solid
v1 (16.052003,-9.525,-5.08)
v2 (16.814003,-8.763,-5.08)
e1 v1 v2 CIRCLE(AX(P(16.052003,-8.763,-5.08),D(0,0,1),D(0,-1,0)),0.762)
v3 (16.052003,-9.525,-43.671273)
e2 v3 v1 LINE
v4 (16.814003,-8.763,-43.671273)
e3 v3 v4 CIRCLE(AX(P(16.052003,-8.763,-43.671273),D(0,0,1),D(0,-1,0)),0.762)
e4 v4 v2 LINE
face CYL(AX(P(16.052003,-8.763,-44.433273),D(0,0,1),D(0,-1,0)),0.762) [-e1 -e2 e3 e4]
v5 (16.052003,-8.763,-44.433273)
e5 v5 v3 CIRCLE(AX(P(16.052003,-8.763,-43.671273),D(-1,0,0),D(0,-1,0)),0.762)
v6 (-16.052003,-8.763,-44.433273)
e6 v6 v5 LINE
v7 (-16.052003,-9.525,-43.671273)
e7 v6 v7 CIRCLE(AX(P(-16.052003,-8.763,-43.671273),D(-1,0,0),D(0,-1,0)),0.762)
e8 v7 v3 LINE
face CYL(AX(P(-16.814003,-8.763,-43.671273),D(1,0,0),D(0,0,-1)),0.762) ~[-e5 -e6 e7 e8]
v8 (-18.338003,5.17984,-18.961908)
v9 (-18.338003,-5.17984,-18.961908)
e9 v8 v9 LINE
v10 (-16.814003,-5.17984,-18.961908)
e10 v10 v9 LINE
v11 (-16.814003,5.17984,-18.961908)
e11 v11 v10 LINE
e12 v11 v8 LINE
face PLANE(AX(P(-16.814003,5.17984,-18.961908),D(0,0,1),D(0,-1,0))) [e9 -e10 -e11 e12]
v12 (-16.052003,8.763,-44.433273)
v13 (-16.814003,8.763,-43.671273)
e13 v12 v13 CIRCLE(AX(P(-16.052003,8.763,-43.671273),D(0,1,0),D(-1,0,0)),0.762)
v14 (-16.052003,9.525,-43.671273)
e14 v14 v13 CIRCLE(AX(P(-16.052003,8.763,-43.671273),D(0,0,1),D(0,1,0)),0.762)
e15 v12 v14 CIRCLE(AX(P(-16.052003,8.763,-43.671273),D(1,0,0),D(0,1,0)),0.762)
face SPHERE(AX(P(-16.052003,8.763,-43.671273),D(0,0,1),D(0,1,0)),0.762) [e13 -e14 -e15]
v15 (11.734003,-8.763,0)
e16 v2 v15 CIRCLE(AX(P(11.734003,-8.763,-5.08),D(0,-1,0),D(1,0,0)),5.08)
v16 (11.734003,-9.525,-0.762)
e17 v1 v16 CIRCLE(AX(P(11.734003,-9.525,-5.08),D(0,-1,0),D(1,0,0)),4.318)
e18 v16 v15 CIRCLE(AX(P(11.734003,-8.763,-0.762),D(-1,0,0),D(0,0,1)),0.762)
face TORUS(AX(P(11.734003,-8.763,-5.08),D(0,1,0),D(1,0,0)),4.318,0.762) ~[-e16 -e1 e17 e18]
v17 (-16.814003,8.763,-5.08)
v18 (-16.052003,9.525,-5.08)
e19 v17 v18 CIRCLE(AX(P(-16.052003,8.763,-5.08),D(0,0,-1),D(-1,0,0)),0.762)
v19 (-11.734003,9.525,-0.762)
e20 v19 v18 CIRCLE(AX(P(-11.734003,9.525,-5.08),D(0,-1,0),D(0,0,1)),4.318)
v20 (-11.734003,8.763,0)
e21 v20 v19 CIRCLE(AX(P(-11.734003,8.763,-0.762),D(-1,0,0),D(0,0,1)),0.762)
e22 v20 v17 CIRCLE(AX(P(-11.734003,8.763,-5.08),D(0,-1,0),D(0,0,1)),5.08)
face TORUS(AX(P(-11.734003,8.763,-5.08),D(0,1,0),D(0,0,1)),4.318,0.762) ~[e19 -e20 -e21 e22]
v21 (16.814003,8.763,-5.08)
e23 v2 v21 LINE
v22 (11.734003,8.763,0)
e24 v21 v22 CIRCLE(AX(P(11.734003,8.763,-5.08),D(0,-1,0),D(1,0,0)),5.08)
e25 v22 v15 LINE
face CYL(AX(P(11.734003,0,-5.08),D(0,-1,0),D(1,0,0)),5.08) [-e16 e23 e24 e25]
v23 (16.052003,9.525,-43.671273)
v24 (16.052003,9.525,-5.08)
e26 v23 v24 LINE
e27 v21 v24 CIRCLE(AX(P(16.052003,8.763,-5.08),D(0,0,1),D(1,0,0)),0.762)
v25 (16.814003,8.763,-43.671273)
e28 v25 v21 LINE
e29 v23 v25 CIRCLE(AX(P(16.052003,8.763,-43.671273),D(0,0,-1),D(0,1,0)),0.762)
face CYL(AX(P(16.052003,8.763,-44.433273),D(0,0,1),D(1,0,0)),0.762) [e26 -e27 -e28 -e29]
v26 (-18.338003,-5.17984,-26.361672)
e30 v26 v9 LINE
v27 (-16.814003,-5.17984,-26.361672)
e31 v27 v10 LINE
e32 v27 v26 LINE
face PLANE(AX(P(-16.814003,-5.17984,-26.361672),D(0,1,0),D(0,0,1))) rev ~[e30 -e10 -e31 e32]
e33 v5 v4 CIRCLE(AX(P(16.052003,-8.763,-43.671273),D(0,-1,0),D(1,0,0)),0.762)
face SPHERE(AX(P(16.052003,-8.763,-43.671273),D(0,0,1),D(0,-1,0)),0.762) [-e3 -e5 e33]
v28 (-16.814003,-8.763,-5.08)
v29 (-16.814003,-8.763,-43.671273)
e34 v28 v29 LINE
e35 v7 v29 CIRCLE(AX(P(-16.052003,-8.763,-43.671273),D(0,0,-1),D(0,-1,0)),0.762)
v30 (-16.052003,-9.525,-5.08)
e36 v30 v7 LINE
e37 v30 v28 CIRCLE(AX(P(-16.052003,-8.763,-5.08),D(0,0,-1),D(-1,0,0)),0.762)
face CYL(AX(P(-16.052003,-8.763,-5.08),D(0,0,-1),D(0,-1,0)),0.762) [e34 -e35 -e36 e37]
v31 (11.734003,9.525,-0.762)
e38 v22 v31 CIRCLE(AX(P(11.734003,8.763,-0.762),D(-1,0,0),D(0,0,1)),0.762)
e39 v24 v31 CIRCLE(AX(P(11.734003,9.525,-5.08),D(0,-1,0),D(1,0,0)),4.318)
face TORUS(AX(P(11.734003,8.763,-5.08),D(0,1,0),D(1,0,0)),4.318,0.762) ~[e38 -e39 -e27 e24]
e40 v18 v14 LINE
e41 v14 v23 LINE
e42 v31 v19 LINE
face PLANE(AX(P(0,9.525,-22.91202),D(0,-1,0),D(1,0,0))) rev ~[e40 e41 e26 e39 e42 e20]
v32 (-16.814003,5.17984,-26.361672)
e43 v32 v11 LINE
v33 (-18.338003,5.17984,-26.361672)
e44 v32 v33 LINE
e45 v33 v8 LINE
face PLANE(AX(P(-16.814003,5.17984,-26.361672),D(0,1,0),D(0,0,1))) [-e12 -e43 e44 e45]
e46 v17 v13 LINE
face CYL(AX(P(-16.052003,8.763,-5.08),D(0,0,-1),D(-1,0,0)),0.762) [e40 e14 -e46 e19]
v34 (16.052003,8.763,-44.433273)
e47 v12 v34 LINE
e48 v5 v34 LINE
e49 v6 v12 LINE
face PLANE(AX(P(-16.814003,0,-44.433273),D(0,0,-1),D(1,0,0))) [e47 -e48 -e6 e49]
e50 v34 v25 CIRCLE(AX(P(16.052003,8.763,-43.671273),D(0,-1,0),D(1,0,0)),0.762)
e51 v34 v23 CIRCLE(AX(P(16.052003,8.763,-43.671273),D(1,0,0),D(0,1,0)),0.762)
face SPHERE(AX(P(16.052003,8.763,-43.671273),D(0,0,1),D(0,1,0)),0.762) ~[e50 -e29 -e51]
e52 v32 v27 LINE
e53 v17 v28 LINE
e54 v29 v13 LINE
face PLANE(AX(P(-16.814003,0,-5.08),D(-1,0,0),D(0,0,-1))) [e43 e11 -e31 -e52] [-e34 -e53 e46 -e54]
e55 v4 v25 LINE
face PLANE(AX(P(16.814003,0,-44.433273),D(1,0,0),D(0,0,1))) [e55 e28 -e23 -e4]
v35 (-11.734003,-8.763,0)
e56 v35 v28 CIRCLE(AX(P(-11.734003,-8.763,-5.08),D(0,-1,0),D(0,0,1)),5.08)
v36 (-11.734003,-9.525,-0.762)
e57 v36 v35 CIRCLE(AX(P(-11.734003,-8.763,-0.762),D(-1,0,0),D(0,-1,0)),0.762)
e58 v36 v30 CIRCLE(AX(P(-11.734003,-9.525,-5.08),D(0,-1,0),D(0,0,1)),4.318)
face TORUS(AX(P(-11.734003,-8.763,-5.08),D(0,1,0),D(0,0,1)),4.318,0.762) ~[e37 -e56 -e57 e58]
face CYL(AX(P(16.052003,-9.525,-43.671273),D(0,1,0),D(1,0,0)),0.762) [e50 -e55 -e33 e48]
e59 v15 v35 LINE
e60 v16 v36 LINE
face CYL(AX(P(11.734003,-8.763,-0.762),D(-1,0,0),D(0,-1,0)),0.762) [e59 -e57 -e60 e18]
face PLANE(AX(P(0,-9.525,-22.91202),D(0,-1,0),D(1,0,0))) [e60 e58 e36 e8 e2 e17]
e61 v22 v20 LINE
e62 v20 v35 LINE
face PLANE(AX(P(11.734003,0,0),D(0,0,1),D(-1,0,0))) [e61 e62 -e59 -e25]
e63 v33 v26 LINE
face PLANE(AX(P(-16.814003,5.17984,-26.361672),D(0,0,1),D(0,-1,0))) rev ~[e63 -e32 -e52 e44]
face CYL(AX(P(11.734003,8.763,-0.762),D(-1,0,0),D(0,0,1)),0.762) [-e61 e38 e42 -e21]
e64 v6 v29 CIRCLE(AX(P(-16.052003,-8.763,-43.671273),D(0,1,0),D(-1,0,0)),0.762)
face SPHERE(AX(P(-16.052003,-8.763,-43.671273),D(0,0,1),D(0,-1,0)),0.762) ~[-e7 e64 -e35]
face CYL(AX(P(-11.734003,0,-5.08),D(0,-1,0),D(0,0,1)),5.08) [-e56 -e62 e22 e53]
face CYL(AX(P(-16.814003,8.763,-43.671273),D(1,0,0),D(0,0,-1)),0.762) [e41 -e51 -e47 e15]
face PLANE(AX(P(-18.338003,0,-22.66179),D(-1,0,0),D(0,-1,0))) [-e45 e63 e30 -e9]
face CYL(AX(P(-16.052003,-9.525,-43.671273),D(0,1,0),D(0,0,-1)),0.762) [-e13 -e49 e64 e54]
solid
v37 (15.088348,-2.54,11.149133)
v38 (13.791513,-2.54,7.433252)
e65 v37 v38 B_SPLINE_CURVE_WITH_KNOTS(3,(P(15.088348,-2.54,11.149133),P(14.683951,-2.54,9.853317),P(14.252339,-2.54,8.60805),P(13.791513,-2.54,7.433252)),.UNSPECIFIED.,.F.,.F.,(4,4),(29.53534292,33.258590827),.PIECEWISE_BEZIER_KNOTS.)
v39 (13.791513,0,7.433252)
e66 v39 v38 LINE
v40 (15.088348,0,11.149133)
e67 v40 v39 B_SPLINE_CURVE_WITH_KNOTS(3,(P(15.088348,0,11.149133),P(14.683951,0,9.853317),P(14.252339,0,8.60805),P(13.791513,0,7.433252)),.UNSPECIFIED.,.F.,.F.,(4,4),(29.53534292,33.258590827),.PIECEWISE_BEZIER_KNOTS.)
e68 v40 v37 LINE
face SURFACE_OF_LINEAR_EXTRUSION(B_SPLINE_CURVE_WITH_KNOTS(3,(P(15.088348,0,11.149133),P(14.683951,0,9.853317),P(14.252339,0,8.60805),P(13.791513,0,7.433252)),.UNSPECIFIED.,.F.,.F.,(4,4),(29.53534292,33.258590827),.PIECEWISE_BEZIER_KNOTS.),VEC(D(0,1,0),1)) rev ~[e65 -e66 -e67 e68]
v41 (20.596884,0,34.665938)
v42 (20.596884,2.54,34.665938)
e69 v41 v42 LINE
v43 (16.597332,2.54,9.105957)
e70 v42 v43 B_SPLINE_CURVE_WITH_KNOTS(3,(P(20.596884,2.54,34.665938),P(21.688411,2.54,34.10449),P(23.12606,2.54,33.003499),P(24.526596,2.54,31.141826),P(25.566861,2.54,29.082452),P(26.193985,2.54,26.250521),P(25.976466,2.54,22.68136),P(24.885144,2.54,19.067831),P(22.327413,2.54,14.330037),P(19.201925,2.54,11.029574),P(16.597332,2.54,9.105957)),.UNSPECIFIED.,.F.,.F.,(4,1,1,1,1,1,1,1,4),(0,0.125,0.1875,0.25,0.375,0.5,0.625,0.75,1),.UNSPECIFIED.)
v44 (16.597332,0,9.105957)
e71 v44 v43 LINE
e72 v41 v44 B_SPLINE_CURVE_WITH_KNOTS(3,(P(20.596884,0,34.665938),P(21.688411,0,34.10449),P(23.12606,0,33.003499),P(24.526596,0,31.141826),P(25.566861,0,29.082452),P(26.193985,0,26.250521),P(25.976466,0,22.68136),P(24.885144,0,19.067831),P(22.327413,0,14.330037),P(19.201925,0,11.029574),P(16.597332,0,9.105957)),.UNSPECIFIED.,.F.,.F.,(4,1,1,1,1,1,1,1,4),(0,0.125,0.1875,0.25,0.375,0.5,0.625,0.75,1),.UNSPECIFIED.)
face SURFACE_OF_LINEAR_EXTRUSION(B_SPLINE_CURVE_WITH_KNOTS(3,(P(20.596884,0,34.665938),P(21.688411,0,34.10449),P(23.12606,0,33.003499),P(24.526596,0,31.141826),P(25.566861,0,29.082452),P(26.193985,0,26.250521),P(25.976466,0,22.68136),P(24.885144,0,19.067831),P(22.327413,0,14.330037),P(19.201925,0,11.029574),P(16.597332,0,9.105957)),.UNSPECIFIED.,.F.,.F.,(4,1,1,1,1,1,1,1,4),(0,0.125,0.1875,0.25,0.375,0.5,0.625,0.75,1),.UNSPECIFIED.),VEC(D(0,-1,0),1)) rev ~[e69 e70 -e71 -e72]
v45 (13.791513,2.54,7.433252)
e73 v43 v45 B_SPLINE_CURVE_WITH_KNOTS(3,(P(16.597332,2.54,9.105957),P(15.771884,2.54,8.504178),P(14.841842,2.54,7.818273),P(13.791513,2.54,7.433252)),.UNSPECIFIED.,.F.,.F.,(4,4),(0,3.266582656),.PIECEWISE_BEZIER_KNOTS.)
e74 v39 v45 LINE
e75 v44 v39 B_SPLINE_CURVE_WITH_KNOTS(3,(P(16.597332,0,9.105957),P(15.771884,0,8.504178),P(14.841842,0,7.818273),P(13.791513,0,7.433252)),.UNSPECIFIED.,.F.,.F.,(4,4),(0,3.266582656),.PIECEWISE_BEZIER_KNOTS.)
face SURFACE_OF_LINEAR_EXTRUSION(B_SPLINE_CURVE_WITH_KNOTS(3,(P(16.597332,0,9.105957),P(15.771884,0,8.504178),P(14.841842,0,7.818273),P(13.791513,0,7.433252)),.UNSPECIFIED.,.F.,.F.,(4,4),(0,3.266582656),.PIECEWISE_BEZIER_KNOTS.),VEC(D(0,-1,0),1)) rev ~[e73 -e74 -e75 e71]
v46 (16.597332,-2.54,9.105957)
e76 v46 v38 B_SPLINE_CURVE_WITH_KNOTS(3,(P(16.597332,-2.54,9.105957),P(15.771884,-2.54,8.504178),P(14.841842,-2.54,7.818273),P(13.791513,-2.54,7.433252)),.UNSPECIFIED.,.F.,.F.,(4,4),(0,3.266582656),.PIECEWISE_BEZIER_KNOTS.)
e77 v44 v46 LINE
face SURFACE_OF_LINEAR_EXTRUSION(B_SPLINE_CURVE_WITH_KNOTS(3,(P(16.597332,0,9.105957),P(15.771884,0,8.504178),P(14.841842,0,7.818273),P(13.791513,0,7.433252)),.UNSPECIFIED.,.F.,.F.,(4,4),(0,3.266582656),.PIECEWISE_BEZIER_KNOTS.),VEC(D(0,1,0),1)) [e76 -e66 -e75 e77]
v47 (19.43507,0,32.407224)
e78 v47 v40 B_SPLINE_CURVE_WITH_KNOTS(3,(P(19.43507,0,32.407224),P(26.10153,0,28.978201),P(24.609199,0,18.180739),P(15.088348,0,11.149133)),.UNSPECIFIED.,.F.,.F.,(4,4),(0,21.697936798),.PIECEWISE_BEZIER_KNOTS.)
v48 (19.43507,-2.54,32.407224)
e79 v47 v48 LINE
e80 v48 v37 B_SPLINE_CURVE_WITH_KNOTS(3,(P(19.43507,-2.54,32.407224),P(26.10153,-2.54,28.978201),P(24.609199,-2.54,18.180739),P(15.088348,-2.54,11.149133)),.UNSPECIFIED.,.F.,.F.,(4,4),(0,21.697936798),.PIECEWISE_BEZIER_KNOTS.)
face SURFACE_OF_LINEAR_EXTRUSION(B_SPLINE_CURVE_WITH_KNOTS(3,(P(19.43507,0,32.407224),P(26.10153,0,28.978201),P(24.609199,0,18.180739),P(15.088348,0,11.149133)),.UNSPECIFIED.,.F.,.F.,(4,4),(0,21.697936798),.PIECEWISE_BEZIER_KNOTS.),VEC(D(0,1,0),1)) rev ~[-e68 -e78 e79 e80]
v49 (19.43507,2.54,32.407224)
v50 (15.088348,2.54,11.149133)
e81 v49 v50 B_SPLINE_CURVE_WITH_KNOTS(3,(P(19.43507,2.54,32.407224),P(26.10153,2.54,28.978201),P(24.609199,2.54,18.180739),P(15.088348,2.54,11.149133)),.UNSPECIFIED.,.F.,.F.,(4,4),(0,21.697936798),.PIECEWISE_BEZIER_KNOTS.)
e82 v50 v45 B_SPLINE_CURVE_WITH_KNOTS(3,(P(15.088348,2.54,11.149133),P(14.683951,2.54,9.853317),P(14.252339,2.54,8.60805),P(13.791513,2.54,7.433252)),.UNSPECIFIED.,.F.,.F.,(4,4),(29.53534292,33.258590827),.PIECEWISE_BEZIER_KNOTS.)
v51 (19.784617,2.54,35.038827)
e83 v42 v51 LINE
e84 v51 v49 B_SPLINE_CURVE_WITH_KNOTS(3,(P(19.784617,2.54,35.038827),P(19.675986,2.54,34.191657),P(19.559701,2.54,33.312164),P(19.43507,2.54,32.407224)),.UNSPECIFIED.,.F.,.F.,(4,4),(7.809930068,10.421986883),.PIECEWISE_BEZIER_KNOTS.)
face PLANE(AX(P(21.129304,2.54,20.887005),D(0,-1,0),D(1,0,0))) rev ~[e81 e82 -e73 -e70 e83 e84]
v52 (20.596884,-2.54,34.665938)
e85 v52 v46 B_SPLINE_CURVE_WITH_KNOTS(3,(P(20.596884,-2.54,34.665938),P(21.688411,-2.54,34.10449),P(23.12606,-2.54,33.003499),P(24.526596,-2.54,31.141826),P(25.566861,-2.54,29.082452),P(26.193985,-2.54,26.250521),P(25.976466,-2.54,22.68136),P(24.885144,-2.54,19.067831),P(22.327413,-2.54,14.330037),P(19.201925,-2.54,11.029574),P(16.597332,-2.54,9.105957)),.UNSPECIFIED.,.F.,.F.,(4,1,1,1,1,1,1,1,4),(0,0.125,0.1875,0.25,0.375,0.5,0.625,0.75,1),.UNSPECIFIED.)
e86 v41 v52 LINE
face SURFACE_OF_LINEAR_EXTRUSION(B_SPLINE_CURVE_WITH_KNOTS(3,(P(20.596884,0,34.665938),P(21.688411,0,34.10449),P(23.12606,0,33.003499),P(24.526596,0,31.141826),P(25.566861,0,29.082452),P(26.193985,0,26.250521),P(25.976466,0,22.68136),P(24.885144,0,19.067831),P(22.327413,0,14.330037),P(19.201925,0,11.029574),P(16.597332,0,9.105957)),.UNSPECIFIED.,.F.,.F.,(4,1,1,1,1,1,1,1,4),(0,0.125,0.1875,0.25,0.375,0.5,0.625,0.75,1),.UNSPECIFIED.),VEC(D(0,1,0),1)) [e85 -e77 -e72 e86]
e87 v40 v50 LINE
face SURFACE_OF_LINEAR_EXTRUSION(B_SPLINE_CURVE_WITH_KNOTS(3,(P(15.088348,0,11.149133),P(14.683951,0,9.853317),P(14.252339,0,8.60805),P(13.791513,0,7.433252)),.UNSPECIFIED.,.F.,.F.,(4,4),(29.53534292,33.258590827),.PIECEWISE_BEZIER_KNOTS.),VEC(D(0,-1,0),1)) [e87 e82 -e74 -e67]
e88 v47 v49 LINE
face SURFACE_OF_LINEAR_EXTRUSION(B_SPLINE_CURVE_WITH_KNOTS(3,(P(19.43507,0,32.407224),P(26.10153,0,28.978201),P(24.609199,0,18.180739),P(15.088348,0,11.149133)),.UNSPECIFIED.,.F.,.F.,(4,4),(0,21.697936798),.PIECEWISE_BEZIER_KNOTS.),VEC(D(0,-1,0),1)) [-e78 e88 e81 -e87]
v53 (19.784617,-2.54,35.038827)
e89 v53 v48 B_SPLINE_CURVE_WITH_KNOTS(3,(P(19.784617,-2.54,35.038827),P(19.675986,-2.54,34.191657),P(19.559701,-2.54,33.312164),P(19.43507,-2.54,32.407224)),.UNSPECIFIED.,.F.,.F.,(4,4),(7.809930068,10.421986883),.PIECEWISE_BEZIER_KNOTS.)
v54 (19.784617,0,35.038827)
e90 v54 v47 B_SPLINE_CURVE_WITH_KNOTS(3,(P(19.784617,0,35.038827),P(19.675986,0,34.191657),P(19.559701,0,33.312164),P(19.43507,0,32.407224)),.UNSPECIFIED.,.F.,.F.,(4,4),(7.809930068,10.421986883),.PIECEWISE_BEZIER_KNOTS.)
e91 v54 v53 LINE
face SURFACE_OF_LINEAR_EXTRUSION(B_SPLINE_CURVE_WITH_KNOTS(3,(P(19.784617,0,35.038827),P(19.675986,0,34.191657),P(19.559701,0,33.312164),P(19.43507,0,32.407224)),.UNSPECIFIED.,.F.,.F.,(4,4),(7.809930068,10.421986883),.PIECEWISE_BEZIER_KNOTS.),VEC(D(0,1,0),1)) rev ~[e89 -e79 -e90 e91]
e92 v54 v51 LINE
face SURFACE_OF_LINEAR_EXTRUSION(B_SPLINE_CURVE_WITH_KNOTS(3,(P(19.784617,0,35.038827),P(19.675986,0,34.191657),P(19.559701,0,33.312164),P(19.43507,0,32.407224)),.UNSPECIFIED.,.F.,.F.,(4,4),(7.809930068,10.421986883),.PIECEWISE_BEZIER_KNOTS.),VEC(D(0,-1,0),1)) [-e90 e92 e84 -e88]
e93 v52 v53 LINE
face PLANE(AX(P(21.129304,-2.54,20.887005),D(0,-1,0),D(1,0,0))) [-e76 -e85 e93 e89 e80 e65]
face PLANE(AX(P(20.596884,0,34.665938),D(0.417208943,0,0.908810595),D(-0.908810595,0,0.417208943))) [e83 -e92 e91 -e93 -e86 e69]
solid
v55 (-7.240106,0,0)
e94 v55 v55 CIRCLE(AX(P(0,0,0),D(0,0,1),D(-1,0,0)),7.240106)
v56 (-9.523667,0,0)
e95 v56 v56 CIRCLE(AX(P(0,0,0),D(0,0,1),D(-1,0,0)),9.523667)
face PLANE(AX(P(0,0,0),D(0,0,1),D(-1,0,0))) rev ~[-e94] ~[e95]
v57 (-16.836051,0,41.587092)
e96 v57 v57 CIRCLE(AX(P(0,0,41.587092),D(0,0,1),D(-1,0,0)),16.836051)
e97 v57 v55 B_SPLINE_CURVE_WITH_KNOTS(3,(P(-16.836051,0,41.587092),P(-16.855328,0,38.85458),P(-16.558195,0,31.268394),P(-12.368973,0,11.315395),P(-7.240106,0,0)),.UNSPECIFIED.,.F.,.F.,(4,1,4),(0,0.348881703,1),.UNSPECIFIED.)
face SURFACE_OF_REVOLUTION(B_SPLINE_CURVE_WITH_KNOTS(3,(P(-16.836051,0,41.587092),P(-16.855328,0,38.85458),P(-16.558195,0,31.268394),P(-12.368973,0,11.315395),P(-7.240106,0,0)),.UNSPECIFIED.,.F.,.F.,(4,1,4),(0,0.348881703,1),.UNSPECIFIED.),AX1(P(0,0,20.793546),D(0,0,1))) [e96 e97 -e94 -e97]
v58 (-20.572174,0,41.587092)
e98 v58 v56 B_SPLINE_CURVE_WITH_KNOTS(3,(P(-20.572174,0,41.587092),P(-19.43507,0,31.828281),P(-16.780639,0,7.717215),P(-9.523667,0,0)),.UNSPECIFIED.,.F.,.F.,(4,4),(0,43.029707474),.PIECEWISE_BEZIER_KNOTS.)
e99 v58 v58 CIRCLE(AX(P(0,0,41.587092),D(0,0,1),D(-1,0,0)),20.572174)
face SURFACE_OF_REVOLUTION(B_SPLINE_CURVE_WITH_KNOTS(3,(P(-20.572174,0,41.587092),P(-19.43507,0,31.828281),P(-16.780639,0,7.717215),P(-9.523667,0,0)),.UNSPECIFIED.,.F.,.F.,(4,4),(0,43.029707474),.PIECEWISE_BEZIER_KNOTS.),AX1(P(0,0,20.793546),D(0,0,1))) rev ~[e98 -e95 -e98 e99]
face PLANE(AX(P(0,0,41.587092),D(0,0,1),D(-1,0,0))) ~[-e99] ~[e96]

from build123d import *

# Parameters (mm, degrees)
F1_DEPTH = 9.525
F2_R     = 0.762
F4_DEPTH = 2.54
F5_W     = 10.3596793488
F5_H     = 7.399763912
F6_DEPTH = 1.524


# Not quite as in the source:
# - the dataset's text gives a spline's control points without its knots; the knots are read off the source's solid


with BuildPart() as f1:
    # F0 (on Front) → F1 (new body, symmetric)
    with BuildSketch(Plane.XZ):
        with BuildLine():
            ThreePointArc((16.8140027672, -5.08), (15.3261052156, -1.4878975516), (11.7340027672, 0))
            Line((11.7340027672, 0), (9.5236673951, 0))
            Line((9.5236673951, 0), (0, 0))
            Line((0, 0), (-7.2401063517, 0))
            Line((-7.2401063517, 0), (-9.5236673951, 0))
            Line((-9.5236673951, 0), (-11.7340027672, 0))
            ThreePointArc((-11.7340027672, 0), (-15.3261052156, -1.4878975516), (-16.8140027672, -5.08))
            Line((-16.8140027672, -5.08), (-16.8140027672, -44.433273375))
            Line((-16.8140027672, -44.433273375), (16.8140027672, -44.433273375))
            Line((16.8140027672, -44.433273375), (16.8140027672, -5.08))
        make_face()
    extrude(amount=F1_DEPTH, both=True)

    # F2
    f2_edges = [f1.edges().sort_by_distance(p)[0] for p in [
        (0, -9.525, 0),
        (16.814003, -9.525, -24.756637),
        (15.326105, -9.525, -1.487898),
        (15.326105, 9.525, -1.487898),
        (0, 9.525, 0),
        (16.814003, 9.525, -24.756637),
        (-15.326105, 9.525, -1.487898),
        (-16.814003, 9.525, -24.756637),
        (0, 9.525, -44.433273),
        (-15.326105, -9.525, -1.487898),
        (-16.814003, -9.525, -24.756637),
        (0, -9.525, -44.433273),
        (-16.814003, 0, -5.08),
        (-16.814003, 0, -44.433273),
        (16.814003, 0, -5.08),
        (16.814003, 0, -44.433273),
    ]]
    fillet(f2_edges, radius=F2_R)

    # F5 (on face) → F6 (join)
    with BuildSketch(Plane(origin=(-16.8140027672, 0, 0), x_dir=(0, -1, 0), z_dir=(-1, 0, 0))):
        with Locations((0, -22.6617902517)):
            Rectangle(F5_W, F5_H)
    extrude(amount=F6_DEPTH)


with BuildPart() as f3:
    # F0 (on Front) → F3 (revolve)
    with BuildSketch(Plane.XZ):
        with BuildLine():
            Line((-9.5236673951, 0), (-7.2401063517, 0))
            add(Edge.make_bspline(
                [(-16.8360508978, 41.5870919824), (-16.8553277932, 38.8545802624), (-16.5581952608, 31.2683940077), (-12.3689733446, 11.3153951243), (-7.2401063517, 0)],
                knots=[0, 0, 0, 0, 0.348881703, 1, 1, 1, 1], degree=3))
            Line((-16.8360508978, 41.5870919824), (-20.5721743405, 41.5870919824))
            add(Edge.make_bspline(
                [(-20.5721743405, 41.5870919824), (-19.4350704551, 31.8282805383), (-16.7806390673, 7.7172145247), (-9.5236673951, 0)],
                knots=[0, 0, 0, 0, 43.0297074737, 43.0297074737, 43.0297074737, 43.0297074737], degree=3))
        make_face()
    revolve(axis=Axis((0, 0, 20.7935459912), (0, 0, 1)))


with BuildPart() as f4:
    # F0 (on Front) → F4 (new body, symmetric)
    with BuildSketch(Plane.XZ):
        with BuildLine():
            add(Edge.make_bspline(
                [(15.0883483115, 11.1491326454), (14.6839512093, 9.8533166215), (14.2523389086, 8.6080504568), (13.7915127177, 7.4332523839)],
                knots=[29.5353429201, 29.5353429201, 29.5353429201, 29.5353429201, 33.2585908266, 33.2585908266, 33.2585908266, 33.2585908266], degree=3))
            add(Edge.make_bspline(
                [(16.5973321119, 9.1059567131), (15.7718844712, 8.504178375), (14.8418424651, 7.8182732686), (13.7915127177, 7.4332523839)],
                knots=[0, 0, 0, 0, 3.2665826556, 3.2665826556, 3.2665826556, 3.2665826556], degree=3))
            add(Edge.make_bspline(
                [(20.5968842238, 34.6659384297), (21.6884105691, 34.104490474), (23.1260600945, 33.0034985903), (24.526596028, 31.141826143), (25.5668613568, 29.0824519601), (26.1939854164, 26.2505211334), (25.9764658619, 22.6813598881), (24.8851440982, 19.0678312081), (22.3274130345, 14.3300367076), (19.2019247954, 11.0295738153), (16.5973321119, 9.1059567131)],
                knots=[0, 0, 0, 0, 0.125, 0.1875, 0.25, 0.375, 0.5, 0.625, 0.75, 1, 1, 1, 1], degree=3))
            Line((20.5968842238, 34.6659384297), (19.784617424, 35.0388268786))
            add(Edge.make_bspline(
                [(19.784617424, 35.0388268786), (19.6759864871, 34.1916570064), (19.5597008725, 33.3121636908), (19.4350704551, 32.4072244666)],
                knots=[7.8099300685, 7.8099300685, 7.8099300685, 7.8099300685, 10.4219868825, 10.4219868825, 10.4219868825, 10.4219868825], degree=3))
            add(Edge.make_bspline(
                [(19.4350704551, 32.4072244666), (26.1015295982, 28.9782006294), (24.6091987938, 18.1807391346), (15.0883483115, 11.1491326454)],
                knots=[0, 0, 0, 0, 21.6979367976, 21.6979367976, 21.6979367976, 21.6979367976], degree=3))
        make_face()
    extrude(amount=F4_DEPTH, both=True)


solid = Compound([f1.part, f3.part, f4.part])
